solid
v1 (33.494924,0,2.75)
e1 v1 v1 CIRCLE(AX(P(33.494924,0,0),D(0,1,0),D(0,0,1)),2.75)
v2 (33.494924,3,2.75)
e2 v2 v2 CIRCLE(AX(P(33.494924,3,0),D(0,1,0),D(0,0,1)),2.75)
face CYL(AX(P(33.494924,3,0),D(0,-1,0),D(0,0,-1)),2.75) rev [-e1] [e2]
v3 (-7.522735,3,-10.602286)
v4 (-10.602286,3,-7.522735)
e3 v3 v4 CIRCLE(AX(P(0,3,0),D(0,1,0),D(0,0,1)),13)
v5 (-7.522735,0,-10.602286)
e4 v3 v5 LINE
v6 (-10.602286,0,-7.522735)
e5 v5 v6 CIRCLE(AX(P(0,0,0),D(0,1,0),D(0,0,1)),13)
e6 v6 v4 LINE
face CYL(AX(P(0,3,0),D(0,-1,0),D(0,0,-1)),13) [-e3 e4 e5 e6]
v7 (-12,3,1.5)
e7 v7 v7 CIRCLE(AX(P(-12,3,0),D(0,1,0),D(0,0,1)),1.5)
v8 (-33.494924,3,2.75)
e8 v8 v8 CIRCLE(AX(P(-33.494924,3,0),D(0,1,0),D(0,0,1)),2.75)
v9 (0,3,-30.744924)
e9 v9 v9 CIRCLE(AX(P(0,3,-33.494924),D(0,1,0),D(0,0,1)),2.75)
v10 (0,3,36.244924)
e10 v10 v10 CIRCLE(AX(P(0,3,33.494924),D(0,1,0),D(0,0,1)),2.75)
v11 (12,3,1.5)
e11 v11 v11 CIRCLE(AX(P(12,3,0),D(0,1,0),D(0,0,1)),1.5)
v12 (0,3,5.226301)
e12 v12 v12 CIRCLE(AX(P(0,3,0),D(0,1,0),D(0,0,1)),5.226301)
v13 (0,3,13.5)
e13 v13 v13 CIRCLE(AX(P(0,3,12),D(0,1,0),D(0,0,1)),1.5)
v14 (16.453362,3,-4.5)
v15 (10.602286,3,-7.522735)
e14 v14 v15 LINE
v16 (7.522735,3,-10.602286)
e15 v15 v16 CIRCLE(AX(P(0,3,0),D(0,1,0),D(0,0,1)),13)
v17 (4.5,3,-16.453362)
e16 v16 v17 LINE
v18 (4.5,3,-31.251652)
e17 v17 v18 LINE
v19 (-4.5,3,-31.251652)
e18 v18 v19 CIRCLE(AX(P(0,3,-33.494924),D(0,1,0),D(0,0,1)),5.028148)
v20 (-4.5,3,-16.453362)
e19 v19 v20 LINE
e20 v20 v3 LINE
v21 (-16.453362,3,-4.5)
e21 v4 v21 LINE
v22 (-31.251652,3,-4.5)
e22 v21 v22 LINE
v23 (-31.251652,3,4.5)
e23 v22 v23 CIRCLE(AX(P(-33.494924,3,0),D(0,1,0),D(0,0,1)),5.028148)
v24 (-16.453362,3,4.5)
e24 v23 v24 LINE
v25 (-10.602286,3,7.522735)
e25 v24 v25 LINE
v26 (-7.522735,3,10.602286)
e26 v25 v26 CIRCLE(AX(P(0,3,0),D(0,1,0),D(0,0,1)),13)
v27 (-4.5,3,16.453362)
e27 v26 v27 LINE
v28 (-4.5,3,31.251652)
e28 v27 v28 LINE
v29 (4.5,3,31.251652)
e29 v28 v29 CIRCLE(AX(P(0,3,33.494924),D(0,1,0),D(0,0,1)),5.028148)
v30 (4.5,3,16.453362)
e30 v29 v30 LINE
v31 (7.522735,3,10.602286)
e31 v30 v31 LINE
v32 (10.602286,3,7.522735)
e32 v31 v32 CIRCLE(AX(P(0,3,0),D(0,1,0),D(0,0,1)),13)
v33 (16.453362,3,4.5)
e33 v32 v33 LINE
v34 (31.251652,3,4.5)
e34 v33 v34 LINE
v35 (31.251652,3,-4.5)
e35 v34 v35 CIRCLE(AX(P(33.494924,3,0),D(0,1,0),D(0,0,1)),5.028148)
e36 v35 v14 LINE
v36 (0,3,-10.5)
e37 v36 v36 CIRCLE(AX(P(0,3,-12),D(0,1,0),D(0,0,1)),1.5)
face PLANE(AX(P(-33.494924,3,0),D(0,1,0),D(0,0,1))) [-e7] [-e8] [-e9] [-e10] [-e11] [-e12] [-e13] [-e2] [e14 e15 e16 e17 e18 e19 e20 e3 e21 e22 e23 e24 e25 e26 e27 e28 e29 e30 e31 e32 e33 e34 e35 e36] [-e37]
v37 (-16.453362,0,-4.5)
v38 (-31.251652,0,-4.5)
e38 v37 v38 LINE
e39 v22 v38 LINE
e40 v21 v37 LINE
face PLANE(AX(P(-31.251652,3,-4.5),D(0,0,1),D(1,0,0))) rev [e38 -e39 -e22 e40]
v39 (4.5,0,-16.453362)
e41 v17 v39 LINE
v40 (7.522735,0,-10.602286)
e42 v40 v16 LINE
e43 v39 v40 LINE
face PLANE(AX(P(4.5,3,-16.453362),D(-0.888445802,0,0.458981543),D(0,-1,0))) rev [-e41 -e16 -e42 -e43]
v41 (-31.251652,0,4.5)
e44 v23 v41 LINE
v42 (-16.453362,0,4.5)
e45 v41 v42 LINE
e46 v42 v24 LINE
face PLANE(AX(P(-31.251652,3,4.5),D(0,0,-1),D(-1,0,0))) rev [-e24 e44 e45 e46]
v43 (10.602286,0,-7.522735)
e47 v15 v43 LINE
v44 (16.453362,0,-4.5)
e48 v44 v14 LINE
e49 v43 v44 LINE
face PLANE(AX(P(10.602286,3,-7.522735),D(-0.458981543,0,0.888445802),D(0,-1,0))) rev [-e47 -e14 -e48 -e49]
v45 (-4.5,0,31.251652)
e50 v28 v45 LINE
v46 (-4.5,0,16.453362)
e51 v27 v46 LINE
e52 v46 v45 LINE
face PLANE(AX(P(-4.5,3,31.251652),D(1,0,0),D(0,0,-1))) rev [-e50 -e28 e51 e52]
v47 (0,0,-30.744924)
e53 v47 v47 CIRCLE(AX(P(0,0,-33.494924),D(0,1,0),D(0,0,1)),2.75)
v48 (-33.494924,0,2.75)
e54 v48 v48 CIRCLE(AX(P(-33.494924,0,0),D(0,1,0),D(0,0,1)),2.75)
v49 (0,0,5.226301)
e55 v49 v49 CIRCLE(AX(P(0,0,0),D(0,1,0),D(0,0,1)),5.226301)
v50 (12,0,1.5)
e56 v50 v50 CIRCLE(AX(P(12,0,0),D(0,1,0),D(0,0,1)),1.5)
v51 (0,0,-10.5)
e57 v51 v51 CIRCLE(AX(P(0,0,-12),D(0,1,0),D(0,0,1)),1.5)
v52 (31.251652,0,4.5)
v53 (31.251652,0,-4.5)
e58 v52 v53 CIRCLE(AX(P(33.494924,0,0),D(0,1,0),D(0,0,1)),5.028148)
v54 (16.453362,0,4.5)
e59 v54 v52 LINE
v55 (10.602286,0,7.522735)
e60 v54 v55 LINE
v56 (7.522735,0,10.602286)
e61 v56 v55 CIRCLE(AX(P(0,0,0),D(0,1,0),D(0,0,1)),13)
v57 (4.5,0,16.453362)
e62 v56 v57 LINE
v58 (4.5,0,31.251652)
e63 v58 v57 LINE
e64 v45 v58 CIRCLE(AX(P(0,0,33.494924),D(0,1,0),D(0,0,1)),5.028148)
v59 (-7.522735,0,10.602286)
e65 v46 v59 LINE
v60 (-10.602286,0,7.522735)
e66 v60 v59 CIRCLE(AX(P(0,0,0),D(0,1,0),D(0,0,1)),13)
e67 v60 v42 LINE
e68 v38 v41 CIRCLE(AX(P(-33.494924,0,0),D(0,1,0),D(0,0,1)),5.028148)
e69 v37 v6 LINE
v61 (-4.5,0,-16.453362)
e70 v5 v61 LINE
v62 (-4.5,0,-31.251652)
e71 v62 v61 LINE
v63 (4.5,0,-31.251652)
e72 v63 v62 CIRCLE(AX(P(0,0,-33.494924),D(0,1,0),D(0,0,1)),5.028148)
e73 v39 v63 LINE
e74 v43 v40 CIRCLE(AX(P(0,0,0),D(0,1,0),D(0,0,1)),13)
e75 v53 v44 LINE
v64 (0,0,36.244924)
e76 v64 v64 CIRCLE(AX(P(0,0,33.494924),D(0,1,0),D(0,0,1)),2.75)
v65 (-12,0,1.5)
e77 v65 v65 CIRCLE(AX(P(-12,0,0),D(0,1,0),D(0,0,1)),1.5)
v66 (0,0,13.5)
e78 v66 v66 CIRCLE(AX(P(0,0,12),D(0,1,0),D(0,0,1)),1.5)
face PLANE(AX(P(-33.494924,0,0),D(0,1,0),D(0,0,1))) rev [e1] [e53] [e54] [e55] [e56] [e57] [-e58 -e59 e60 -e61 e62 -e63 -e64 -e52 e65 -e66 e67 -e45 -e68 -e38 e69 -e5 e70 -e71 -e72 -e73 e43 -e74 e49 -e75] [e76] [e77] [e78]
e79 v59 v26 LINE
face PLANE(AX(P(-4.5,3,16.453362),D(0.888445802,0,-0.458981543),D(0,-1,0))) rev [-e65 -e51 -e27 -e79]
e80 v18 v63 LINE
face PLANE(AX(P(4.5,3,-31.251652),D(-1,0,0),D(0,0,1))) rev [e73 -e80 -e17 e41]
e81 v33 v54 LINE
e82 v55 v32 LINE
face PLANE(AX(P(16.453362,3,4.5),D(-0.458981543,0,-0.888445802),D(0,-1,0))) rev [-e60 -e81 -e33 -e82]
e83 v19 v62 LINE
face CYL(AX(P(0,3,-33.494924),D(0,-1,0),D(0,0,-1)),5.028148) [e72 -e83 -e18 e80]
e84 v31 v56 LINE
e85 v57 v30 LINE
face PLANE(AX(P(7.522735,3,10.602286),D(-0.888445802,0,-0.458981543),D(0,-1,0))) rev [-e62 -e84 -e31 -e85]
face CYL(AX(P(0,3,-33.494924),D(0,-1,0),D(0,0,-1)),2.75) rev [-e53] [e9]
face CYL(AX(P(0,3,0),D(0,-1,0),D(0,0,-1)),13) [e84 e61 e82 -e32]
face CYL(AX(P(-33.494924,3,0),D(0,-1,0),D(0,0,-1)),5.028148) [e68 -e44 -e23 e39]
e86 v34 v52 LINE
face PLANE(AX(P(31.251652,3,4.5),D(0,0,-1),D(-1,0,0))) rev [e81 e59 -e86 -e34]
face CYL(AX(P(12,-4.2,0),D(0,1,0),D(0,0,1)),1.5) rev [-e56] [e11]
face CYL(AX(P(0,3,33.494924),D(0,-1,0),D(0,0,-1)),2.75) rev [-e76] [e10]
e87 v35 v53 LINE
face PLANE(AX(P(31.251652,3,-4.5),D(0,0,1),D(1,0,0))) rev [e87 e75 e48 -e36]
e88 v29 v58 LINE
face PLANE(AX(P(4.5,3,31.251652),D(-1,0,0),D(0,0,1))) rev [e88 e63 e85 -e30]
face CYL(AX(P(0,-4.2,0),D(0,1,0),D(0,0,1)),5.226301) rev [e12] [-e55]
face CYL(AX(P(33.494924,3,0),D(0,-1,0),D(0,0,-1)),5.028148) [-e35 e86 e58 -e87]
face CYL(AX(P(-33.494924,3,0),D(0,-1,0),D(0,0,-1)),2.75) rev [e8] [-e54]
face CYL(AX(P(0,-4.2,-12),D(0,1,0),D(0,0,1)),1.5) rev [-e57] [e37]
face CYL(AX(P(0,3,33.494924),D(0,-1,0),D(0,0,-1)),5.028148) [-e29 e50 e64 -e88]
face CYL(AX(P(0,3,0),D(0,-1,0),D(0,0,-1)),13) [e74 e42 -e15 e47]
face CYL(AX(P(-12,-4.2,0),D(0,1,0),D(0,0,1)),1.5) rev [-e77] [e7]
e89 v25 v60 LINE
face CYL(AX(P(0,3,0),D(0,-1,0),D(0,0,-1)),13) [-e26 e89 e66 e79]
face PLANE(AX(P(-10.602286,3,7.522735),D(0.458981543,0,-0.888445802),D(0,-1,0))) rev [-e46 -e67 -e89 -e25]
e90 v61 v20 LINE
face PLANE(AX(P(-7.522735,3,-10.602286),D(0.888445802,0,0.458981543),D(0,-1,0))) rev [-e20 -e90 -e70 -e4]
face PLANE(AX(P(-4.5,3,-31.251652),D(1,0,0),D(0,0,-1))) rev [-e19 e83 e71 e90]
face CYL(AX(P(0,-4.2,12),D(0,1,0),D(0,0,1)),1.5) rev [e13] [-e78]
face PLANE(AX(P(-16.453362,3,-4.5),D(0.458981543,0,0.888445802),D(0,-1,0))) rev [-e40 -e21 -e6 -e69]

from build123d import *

# Parameters (mm, degrees)
SKETCH1_R           = 2.75
BOSS_EXTRUDE1_DEPTH = 3
SKETCH5_R           = 5.226301297
SKETCH5_R_2         = 1.5
CUT_EXTRUDE2_DEPTH  = 7.2


with BuildPart() as part:
    # Sketch1 → Boss-Extrude1 (new body)
    with BuildSketch(Plane(origin=(0, 0, 0), x_dir=(1, 0, 0), z_dir=(0, 1, 0))):
        with BuildLine():
            Line((-4.5, 31.251652173), (-4.5, 12.196310918))
            ThreePointArc((-4.5, 12.196310918), (-9.192388155, 9.192388155), (-12.196310918, 4.5))
            Line((-12.196310918, 4.5), (-31.251652173, 4.5))
            ThreePointArc((-31.251652173, 4.5), (-38.523072163, 0), (-31.251652173, -4.5))
            Line((-31.251652173, -4.5), (-12.196310918, -4.5))
            ThreePointArc((-12.196310918, -4.5), (-9.192388155, -9.192388155), (-4.5, -12.196310918))
            Line((-4.5, -12.196310918), (-4.5, -31.251652173))
            ThreePointArc((-4.5, -31.251652173), (0, -38.523072163), (4.5, -31.251652173))
            Line((4.5, -31.251652173), (4.5, -12.196310918))
            ThreePointArc((4.5, -12.196310918), (9.192388155, -9.192388155), (12.196310918, -4.5))
            Line((12.196310918, -4.5), (31.251652173, -4.5))
            ThreePointArc((31.251652173, -4.5), (38.523072163, 0), (31.251652173, 4.5))
            Line((31.251652173, 4.5), (12.196310918, 4.5))
            ThreePointArc((12.196310918, 4.5), (9.192388155, 9.192388155), (4.5, 12.196310918))
            Line((4.5, 12.196310918), (4.5, 31.251652173))
            ThreePointArc((4.5, 31.251652173), (0, 38.523072163), (-4.5, 31.251652173))
        make_face()
        with Locations(Location((0, -33.494924376, 0), (0, 0, 270))):
            Circle(SKETCH1_R, mode=Mode.SUBTRACT)
        with Locations(Location((-33.494924376, 0, 0), (0, 0, 270))):
            Circle(SKETCH1_R, mode=Mode.SUBTRACT)
        with Locations(Location((0, 33.494924376, 0), (0, 0, 270))):
            Circle(SKETCH1_R, mode=Mode.SUBTRACT)
        with Locations(Location((33.494924376, 0, 0), (0, 0, 270))):
            Circle(SKETCH1_R, mode=Mode.SUBTRACT)
    extrude(amount=BOSS_EXTRUDE1_DEPTH)

    # Chamfer1
    # the kernel refuses this chamfer: 5 mm, written as the material it adds along each edge
    with BuildSketch(Plane(origin=(-12.196310918, 0, -4.5), x_dir=(0.4944512114841002, 0, -0.869205383935181), z_dir=(0, 1, 0)), Plane(origin=(4.5, 0, -12.196310918), x_dir=(0.8692053839351812, 0, 0.4944512114841002), z_dir=(0, 1, 0)), Plane(origin=(12.196310918, 0, 4.5), x_dir=(-0.4944512114841005, 0, 0.869205383935181), z_dir=(0, 1, 0)), Plane(origin=(-4.5, 0, 12.196310918), x_dir=(-0.869205383935182, 0, -0.4944512114840988), z_dir=(0, 1, 0))) as chamfer1_piece_1:
        with BuildLine():
            Line((3.583193205, 0), (-2.272552352, 3.809310984))
            Line((-2.272552352, 3.809310984), (-2.359472891, 3.759865863))
            ThreePointArc((-2.359472891, 3.759865863), (-1.183301792, 1.877904769), (-0.086920538, -0.049445121))
            Line((-0.086920538, -0.049445121), (0.016300434, -0.098662535))
            ThreePointArc((0.016300434, -0.098662535), (1.789817923, 0.069668276), (3.573220218, -0.099501455))
            Line((3.573220218, -0.099501455), (3.583193205, 0))
        make_face()
    extrude(amount=3)
    with BuildSketch(Plane(origin=(-4.5, 0, -12.196310918), x_dir=(0.020694934032123476, 0, -0.9997858369197905), z_dir=(0, 1, 0)), Plane(origin=(12.196310918, 0, -4.5), x_dir=(0.9997858369197905, 0, 0.020694934032131303), z_dir=(0, 1, 0)), Plane(origin=(4.5, 0, 12.196310918), x_dir=(-0.020694934032078793, 0, 0.9997858369197915), z_dir=(0, 1, 0)), Plane(origin=(-12.196310918, 0, 4.5), x_dir=(-0.9997858369197906, 0, -0.020694934032118258), z_dir=(0, 1, 0))) as chamfer1_piece_2:
        with BuildLine():
            Line((4.435689841, 0), (-1.835789795, 3.077198299))
            Line((-1.835789795, 3.077198299), (-1.916130816, 3.017655706))
            ThreePointArc((-1.916130816, 3.017655706), (-0.857153439, 1.572765033), (-0.093081321, -0.036549524))
            Line((-0.093081321, -0.036549524), (0.002069493, -0.099978584))
            ThreePointArc((0.002069493, -0.099978584), (2.218964555, -0.054090259), (4.437759335, -0.099978584))
            Line((4.437759335, -0.099978584), (4.435689841, 0))
        make_face()
    extrude(amount=3)

    # Sketch5 → Cut-Extrude2 (cut)
    with BuildSketch(Plane(origin=(0, 3, 0), x_dir=(1, 0, 0), z_dir=(0, 1, 0))):
        with Locations(Location((0, 0, 0), (0, 0, 270))):
            Circle(SKETCH5_R)
        with Locations(Location((-1.03e-07, 12, 0), (0, 0, 270))):
            Circle(SKETCH5_R_2)
        with Locations(Location((12, 1.03e-07, 0), (0, 0, 270))):
            Circle(SKETCH5_R_2)
        with Locations(Location((1.03e-07, -12, 0), (0, 0, 270))):
            Circle(SKETCH5_R_2)
        with Locations(Location((-12, -1.03e-07, 0), (0, 0, 270))):
            Circle(SKETCH5_R_2)
    extrude(amount=-CUT_EXTRUDE2_DEPTH, mode=Mode.SUBTRACT)


solid = part.part
